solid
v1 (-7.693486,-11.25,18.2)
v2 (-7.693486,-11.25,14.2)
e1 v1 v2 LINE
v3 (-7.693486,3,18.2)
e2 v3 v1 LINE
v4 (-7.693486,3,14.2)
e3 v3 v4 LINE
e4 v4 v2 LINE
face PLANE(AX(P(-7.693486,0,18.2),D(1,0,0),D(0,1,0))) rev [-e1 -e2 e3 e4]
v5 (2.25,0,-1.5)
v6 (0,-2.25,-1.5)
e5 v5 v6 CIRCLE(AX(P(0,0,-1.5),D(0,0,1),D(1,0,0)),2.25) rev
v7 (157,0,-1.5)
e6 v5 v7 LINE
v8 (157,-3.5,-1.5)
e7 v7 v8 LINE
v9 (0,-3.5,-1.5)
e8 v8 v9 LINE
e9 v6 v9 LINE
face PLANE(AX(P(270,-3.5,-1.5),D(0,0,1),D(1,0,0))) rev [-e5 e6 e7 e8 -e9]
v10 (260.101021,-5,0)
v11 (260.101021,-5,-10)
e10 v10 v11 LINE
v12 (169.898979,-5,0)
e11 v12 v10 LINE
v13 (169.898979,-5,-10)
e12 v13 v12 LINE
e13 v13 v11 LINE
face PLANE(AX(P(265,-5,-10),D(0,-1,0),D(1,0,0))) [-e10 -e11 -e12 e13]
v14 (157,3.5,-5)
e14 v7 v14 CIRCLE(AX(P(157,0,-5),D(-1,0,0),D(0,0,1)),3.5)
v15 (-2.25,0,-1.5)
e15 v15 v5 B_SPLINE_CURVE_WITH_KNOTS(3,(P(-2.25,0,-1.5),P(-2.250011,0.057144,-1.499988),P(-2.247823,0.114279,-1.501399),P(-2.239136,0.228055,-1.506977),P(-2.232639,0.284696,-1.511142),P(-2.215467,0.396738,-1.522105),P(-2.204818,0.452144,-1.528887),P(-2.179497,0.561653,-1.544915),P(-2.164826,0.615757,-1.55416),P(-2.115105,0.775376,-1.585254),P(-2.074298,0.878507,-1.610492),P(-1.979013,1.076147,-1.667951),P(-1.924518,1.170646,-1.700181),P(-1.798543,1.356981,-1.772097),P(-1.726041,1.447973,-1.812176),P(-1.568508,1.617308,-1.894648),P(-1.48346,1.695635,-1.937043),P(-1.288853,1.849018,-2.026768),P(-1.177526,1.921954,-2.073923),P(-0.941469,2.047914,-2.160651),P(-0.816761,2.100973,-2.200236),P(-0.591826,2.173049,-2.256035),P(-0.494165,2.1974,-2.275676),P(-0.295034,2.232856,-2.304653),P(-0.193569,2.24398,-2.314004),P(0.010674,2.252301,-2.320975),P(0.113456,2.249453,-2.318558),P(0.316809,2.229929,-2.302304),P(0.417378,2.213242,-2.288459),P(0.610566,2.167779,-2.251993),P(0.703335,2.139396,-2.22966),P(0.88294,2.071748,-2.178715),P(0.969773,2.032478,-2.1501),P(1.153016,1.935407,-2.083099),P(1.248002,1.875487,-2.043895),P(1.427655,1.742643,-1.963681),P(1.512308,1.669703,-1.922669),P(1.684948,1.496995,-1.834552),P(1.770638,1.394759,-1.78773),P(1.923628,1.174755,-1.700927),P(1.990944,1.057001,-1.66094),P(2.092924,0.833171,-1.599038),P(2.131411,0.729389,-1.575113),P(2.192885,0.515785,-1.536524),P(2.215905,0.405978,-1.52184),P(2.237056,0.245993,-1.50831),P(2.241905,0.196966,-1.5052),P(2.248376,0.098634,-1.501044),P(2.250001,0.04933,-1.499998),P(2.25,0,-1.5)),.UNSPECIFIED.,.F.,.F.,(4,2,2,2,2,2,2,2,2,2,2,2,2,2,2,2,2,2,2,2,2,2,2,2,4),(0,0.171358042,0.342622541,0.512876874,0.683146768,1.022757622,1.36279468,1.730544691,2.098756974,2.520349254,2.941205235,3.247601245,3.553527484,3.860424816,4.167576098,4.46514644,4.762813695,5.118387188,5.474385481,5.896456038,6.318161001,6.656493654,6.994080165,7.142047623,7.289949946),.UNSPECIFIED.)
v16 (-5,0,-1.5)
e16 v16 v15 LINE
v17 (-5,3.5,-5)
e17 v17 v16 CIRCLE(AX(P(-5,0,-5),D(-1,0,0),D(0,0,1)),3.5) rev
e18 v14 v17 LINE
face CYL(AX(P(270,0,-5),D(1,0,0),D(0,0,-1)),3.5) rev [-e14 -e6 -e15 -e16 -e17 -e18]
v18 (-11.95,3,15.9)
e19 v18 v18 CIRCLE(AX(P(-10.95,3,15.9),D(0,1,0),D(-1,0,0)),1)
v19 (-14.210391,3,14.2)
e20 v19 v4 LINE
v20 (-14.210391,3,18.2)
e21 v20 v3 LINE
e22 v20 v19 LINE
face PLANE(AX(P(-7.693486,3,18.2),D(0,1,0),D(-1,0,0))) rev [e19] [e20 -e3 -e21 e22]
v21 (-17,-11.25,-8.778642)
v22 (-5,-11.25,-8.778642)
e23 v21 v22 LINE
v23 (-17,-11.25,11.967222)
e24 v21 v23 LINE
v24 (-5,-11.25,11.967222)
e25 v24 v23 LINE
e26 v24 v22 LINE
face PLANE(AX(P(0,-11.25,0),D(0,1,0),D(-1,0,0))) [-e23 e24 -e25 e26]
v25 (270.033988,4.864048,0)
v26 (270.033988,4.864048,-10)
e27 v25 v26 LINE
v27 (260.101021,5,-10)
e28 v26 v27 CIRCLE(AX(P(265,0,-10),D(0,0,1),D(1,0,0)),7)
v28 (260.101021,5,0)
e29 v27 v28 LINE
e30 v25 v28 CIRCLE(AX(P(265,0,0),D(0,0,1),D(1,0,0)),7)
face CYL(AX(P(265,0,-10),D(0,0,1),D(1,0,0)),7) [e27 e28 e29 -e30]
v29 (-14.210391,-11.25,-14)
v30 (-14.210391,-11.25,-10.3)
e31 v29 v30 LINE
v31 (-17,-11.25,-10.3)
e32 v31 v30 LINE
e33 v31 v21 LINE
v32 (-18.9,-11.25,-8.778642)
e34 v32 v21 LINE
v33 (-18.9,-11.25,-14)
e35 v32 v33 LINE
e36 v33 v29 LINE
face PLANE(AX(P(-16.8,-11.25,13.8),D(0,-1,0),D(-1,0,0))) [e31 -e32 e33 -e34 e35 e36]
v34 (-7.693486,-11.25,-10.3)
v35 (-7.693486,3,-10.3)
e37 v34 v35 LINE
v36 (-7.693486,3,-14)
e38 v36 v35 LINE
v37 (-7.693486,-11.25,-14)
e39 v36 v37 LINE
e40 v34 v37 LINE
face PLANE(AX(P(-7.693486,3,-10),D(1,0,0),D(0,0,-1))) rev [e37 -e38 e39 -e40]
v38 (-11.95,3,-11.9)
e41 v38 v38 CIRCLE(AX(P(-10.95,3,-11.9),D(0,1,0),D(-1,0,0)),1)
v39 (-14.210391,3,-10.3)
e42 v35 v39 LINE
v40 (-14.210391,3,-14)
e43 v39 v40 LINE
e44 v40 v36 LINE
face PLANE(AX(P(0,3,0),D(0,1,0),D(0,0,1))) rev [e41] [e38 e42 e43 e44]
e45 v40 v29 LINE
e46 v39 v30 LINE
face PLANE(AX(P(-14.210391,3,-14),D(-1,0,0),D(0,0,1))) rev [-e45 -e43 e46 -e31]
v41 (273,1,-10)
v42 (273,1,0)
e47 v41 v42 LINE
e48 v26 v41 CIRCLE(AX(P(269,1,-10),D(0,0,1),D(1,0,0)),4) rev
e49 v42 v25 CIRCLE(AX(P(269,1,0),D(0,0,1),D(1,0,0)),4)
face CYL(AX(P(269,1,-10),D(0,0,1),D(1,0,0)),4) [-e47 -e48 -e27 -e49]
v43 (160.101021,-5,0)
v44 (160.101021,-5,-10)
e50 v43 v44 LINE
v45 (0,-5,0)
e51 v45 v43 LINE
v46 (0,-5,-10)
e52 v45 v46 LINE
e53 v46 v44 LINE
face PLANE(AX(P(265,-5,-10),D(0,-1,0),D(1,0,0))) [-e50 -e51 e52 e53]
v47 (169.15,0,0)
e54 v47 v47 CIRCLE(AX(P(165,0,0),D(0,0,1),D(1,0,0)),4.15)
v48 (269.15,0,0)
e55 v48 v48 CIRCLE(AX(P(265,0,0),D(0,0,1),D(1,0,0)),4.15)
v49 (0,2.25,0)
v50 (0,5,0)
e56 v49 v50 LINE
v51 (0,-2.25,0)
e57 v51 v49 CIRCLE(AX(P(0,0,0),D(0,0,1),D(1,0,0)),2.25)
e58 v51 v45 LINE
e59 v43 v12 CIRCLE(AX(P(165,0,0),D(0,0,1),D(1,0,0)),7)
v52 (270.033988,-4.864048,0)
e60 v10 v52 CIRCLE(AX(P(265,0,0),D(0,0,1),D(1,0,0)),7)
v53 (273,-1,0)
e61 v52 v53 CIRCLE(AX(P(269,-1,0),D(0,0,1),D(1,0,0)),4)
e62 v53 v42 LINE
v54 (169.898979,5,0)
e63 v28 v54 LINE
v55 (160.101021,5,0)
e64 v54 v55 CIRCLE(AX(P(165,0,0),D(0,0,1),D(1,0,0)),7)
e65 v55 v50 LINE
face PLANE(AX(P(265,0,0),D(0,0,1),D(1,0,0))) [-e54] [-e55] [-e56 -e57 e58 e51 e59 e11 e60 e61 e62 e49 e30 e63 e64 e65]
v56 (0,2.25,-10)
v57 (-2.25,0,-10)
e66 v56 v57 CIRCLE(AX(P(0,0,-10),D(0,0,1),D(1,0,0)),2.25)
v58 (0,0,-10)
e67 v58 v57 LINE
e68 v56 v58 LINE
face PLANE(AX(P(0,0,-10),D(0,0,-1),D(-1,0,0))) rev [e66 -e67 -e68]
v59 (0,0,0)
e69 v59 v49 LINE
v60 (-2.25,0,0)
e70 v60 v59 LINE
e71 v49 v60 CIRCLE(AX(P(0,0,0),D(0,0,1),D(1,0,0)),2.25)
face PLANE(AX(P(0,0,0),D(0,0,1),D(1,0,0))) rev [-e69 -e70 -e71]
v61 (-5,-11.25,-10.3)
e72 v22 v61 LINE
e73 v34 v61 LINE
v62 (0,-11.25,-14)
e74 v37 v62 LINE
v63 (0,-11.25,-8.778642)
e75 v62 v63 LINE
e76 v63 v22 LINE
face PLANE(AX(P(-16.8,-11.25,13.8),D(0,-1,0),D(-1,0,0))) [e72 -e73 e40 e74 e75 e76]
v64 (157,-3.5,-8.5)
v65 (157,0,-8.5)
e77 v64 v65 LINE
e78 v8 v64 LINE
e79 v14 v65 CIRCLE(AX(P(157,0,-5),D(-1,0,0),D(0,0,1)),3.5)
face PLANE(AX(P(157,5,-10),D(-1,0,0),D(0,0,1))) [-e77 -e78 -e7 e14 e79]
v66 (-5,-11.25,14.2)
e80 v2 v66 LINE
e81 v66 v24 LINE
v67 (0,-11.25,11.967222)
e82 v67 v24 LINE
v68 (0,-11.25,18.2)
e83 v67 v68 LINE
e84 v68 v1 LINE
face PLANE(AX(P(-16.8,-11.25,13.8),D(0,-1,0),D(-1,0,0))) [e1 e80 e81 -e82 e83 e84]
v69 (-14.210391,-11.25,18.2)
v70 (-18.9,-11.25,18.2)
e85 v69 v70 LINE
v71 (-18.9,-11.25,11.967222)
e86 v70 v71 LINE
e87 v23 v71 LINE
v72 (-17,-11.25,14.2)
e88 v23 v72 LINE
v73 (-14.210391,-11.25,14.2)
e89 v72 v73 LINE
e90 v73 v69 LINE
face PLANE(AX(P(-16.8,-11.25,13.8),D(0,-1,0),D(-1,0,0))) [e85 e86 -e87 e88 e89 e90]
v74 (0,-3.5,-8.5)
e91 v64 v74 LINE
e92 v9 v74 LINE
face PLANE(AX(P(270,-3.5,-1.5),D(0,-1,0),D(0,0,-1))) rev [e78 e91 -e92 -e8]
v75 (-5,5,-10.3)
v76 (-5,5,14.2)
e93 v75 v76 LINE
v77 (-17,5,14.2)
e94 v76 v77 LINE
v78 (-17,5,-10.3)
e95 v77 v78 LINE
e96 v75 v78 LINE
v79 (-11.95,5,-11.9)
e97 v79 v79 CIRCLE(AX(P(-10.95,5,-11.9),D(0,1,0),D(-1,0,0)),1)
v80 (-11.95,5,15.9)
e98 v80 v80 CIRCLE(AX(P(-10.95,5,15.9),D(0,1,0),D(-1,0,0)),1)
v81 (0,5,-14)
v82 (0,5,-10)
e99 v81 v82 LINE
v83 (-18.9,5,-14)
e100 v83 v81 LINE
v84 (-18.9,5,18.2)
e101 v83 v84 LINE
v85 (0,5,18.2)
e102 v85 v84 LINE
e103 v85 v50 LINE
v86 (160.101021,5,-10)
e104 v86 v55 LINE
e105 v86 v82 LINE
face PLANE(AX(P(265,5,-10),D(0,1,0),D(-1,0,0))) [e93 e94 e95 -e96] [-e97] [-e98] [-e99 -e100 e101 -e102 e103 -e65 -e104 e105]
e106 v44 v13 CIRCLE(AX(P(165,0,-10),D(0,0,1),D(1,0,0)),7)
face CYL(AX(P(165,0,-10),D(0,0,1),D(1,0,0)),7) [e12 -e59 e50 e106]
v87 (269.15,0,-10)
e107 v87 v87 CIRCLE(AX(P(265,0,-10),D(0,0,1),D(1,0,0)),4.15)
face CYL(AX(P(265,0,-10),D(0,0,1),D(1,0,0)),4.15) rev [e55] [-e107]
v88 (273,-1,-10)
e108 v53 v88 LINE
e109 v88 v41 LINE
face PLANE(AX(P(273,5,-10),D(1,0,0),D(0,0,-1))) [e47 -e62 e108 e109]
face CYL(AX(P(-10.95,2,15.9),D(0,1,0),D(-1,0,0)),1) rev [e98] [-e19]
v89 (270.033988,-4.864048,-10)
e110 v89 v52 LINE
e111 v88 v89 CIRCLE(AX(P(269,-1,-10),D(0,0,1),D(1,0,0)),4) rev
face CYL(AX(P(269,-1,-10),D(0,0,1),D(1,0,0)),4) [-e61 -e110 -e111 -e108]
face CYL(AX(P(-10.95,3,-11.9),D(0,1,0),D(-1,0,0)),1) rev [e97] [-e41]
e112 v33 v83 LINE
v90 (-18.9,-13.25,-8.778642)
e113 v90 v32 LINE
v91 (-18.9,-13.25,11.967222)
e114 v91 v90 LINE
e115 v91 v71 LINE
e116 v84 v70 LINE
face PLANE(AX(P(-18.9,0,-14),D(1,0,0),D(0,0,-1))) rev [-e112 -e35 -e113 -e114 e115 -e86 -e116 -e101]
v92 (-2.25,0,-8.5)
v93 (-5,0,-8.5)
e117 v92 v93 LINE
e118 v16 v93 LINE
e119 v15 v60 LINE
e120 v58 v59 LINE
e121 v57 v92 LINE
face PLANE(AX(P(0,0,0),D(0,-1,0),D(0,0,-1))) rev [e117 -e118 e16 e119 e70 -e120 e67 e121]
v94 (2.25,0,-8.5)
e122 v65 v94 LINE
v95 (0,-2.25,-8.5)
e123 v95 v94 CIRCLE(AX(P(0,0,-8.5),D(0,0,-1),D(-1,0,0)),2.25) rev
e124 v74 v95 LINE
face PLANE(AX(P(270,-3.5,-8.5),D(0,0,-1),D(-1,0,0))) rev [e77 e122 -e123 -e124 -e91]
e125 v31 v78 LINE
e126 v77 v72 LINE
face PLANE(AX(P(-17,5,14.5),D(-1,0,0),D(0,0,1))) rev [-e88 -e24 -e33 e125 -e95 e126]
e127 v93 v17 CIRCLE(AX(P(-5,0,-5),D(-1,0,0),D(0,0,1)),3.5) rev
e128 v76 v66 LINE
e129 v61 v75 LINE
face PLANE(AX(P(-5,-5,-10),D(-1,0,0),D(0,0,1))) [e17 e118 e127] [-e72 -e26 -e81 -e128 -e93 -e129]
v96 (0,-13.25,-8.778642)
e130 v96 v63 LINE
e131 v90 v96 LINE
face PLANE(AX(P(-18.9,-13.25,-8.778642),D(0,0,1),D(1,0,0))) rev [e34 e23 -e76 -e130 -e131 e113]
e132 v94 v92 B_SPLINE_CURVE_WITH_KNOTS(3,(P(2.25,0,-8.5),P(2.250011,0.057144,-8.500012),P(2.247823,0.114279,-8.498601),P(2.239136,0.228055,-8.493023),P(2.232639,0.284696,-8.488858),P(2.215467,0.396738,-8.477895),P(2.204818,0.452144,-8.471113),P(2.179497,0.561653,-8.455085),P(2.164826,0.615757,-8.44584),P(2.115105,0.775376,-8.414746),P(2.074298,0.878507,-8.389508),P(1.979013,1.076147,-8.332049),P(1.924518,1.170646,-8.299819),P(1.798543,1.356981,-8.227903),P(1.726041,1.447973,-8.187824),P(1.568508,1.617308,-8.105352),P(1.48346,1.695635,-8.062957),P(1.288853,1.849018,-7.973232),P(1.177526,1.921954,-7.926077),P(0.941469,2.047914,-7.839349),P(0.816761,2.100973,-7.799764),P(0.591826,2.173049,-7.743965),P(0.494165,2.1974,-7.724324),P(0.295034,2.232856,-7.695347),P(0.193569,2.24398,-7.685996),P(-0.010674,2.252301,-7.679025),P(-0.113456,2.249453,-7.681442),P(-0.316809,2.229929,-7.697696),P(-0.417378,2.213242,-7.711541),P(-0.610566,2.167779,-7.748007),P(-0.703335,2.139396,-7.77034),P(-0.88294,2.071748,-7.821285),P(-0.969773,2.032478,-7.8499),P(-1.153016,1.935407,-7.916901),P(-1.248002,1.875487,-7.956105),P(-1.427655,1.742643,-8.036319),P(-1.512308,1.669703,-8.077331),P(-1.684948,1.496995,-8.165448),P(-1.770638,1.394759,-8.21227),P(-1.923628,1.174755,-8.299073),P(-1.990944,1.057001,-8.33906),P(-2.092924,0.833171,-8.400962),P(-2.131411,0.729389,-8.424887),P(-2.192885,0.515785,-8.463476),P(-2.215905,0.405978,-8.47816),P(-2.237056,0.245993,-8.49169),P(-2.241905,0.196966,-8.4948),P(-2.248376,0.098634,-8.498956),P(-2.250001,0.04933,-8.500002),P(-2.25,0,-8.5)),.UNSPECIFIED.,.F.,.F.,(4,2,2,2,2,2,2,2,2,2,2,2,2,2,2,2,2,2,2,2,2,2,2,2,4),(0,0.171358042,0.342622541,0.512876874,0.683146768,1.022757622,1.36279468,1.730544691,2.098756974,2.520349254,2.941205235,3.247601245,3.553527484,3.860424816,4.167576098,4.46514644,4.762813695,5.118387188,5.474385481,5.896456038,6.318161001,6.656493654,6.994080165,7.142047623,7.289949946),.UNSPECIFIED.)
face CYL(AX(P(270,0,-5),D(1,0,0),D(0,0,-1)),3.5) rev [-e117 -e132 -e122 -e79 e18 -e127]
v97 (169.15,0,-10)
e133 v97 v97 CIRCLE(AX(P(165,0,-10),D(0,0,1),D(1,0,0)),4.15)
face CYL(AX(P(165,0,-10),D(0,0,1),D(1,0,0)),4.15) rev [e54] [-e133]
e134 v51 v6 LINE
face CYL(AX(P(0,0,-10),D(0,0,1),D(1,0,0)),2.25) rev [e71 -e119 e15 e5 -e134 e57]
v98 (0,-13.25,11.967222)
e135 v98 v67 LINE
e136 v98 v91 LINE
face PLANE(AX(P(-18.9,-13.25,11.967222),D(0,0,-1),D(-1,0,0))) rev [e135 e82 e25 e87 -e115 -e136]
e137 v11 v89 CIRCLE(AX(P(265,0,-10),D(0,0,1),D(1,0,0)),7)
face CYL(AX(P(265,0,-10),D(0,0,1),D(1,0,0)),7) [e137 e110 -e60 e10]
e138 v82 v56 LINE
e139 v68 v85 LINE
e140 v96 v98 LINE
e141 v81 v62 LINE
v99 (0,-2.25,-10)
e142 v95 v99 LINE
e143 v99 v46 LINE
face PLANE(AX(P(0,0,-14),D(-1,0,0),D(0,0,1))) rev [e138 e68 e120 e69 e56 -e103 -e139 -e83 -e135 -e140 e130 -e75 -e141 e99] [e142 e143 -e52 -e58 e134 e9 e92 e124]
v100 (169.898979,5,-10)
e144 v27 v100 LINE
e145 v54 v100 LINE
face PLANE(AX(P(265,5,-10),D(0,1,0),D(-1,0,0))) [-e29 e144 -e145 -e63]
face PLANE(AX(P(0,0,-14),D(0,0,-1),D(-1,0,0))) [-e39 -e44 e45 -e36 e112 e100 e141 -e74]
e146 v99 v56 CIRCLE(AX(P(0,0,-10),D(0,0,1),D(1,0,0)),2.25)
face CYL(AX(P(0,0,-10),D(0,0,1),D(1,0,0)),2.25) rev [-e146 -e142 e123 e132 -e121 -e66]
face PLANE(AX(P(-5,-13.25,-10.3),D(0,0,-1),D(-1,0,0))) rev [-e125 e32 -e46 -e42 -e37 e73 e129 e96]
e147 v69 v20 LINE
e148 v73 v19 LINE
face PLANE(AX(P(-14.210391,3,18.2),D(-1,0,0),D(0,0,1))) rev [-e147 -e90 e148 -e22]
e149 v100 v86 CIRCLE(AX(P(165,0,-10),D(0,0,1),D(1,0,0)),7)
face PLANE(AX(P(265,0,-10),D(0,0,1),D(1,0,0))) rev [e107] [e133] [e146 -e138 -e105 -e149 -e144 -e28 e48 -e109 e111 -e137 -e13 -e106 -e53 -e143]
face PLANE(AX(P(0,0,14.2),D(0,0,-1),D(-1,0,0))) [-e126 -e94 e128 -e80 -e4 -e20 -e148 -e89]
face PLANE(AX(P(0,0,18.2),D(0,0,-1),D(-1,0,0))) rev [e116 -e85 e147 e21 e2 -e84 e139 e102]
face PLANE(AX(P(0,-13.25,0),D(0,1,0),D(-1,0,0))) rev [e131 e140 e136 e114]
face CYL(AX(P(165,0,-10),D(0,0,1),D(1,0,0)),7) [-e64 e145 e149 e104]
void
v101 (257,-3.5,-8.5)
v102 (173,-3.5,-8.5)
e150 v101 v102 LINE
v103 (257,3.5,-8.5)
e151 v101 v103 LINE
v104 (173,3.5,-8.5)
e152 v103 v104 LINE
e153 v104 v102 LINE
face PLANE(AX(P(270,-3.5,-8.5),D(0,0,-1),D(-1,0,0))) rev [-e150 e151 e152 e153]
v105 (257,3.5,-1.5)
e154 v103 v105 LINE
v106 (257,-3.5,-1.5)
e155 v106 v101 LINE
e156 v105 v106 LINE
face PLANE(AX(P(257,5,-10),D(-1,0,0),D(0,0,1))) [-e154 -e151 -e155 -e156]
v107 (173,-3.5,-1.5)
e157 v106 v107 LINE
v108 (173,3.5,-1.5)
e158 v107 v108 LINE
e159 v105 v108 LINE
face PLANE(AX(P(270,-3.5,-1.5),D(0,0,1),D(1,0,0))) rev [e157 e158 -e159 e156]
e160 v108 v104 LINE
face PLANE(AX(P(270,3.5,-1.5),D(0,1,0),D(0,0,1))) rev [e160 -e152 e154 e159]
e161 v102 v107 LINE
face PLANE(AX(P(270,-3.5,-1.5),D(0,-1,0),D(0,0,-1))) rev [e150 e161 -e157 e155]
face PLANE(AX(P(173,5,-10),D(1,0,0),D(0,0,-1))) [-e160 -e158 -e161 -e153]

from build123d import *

# Parameters (mm, degrees)
SKETCH_1_R          = 2.25
SKETCH_1_R_2        = 1.75
EXTRUDE_1_DEPTH     = 10
SKETCH_3_W          = 7
SKETCH_3_H          = 7
CUT_EXTRUDE_1_DEPTH = 276.22717889
EXTRUDE_2_DEPTH     = 4
SKETCH_7_R          = 1
CUT_EXTRUDE_2_DEPTH = 2
SKETCH_8_W          = 6.516904704
SKETCH_8_H          = 4
CUT_EXTRUDE_3_DEPTH = 3
SKETCH_9_W          = 1.9
SKETCH_9_H          = 5
EXTRUDE_3_DEPTH     = 24.5
SKETCH_10_W         = 5
SKETCH_10_H         = 5
EXTRUDE_4_DEPTH     = 14.2
EXTRUDE_9_DEPTH     = 4
SKETCH_12_R         = 1
CUT_EXTRUDE_4_DEPTH = 3
EXTRUDE_10_DEPTH    = 11.25
SKETCH_14_W         = 18.9
SKETCH_14_H         = 20.745864208
EXTRUDE_13_DEPTH    = 2
SKETCH_15_W         = 12
SKETCH_15_H         = 0.3
CUT_EXTRUDE_5_DEPTH = 272.22739998
SKETCH_16_W         = 16
SKETCH_16_H         = 10
EXTRUDE_14_DEPTH    = 10
FILLET_1_R          = 4
SKETCH_17_R         = 4.04
CUT_EXTRUDE_7_DEPTH = 10
SKETCH_20_R         = 7
SKETCH_20_R_2       = 4.04
EXTRUDE_15_DEPTH    = 10
FILLET_3_R          = 3.5
SKETCH_21_R         = 4.15
CUT_EXTRUDE_8_DEPTH = 10


with BuildPart() as part:
    # 草图1 → 凸台-拉伸1 (new body)
    with BuildSketch(Plane.XY):
        with BuildLine():
            Line((265, 5), (-5, 5))
            Line((-5, 5), (-5, -5))
            Line((-5, -5), (265, -5))
            ThreePointArc((265, -5), (270, 0), (265, 5))
        make_face()
        Circle(SKETCH_1_R, mode=Mode.SUBTRACT)
        with Locations((165, 0)):
            Circle(SKETCH_1_R_2, mode=Mode.SUBTRACT)
        with Locations((265, 0)):
            Circle(SKETCH_1_R_2, mode=Mode.SUBTRACT)
    extrude(amount=-EXTRUDE_1_DEPTH)

    # 草图3 → 切除-拉伸1 (cut, through all)
    with BuildSketch(Plane.ZY.offset(5)):
        with Locations((-5, 0)):
            Rectangle(SKETCH_3_W, SKETCH_3_H)
    extrude(amount=-CUT_EXTRUDE_1_DEPTH, mode=Mode.SUBTRACT)

    # 草图5 → 凸台-拉伸2 (add)
    with BuildSketch(Plane(origin=(0, 0, -10), x_dir=(-1, 0, 0), z_dir=(0, 0, -1))):
        Polygon((5, 5), (18.9, 5), (18.9, 0), (0, 0), (0, 5), align=None)
    extrude(amount=EXTRUDE_2_DEPTH)

    # 草图7 → 切除-拉伸2 (cut)
    with BuildSketch(Plane(origin=(0, 5, 0), x_dir=(1, 0, 0), z_dir=(0, 1, 0))):
        with Locations(Location((-10.95, 11.9, 0), (0, 0, 180))):
            Circle(SKETCH_7_R)
    extrude(amount=-CUT_EXTRUDE_2_DEPTH, mode=Mode.SUBTRACT)

    # 草图8 → 切除-拉伸3 (cut)
    with BuildSketch(Plane.XZ):
        with Locations((-10.951938586, -12)):
            Rectangle(SKETCH_8_W, SKETCH_8_H)
    extrude(amount=-CUT_EXTRUDE_3_DEPTH, mode=Mode.SUBTRACT)

    # 草图9 → 凸台-拉伸3 (add)
    with BuildSketch(Plane.XY.offset(-10)):
        with Locations((-17.95, 2.5)):
            Rectangle(SKETCH_9_W, SKETCH_9_H)
    extrude(amount=EXTRUDE_3_DEPTH)

    # 草图10 → 凸台-拉伸4 (add)
    with BuildSketch(Plane.XY):
        with Locations((-2.5, 2.5)):
            Rectangle(SKETCH_10_W, SKETCH_10_H)
    extrude(amount=EXTRUDE_4_DEPTH)

    # 草图11 → 凸台-拉伸9 (add)
    with BuildSketch(Plane.XY.offset(14.2)):
        Polygon((0, 0), (-7.693486234, 0), (-7.693486234, 3), (-14.210390938, 3), (-14.210390938, 0), (-18.9, 0), (-18.9, 5), (0, 5), align=None)
    extrude(amount=EXTRUDE_9_DEPTH)

    # 草图12 → 切除-拉伸4 (cut)
    with BuildSketch(Plane(origin=(0, 5, 0), x_dir=(1, 0, 0), z_dir=(0, 1, 0))):
        with Locations(Location((-10.95, -15.9, 0), (0, 0, 180))):
            Circle(SKETCH_12_R)
    extrude(amount=-CUT_EXTRUDE_4_DEPTH, mode=Mode.SUBTRACT)

    # 草图13 → 凸台-拉伸10 (add)
    with BuildSketch(Plane.XZ):
        Polygon((-14.210390938, -14), (-14.210390938, -10), (-17, -10), (-17, 14.2), (-14.210390938, 14.2), (-14.210390938, 18.2), (-18.9, 18.2), (-18.9, -14), align=None)
        Polygon((-7.693486234, -14), (0, -14), (0, -10), (0, 18.2), (-7.693486234, 18.2), (-7.693486234, 14.2), (-5, 14.2), (-5, -10), (-7.693486234, -10), align=None)
    extrude(amount=EXTRUDE_10_DEPTH)

    # 草图14 → 凸台-拉伸13 (add)
    with BuildSketch(Plane(origin=(0, -11.25, 0), x_dir=(-1, 0, 0), z_dir=(0, -1, 0))):
        with Locations((9.45, -1.594289746)):
            Rectangle(SKETCH_14_W, SKETCH_14_H)
    extrude(amount=EXTRUDE_13_DEPTH)

    # 草图15 → 切除-拉伸5 (cut, through all)
    with BuildSketch(Plane(origin=(0, 5, 0), x_dir=(1, 0, 0), z_dir=(0, 1, 0))):
        with Locations((-11, 10.15)):
            Rectangle(SKETCH_15_W, SKETCH_15_H)
    extrude(amount=-CUT_EXTRUDE_5_DEPTH, mode=Mode.SUBTRACT)

    # 草图16 → 凸台-拉伸14 (add)
    with BuildSketch(Plane.XY):
        with Locations((165, 0)):
            Rectangle(SKETCH_16_W, SKETCH_16_H)
        with Locations((265, 0)):
            Rectangle(SKETCH_16_W, SKETCH_16_H)
    extrude(amount=-EXTRUDE_14_DEPTH)

    # 圆角1
    fillet_1_edges = [part.edges().sort_by_distance(p)[0] for p in [
        (273, -5, -5),
        (273, 5, -5),
    ]]
    fillet(fillet_1_edges, radius=FILLET_1_R)

    # 草图17 → 切除-拉伸7 (cut)
    with BuildSketch(Plane.XY):
        with Locations((165, 0)):
            Circle(SKETCH_17_R)
        with Locations((265, 0)):
            Circle(SKETCH_17_R)
    extrude(amount=-CUT_EXTRUDE_7_DEPTH, mode=Mode.SUBTRACT)

    # 草图20 → 凸台-拉伸15 (add)
    # profile 1 of 2: a face of its own
    with BuildSketch(Plane.XY):
        with Locations((165, 0)):
            Circle(SKETCH_20_R)
        with Locations((165, 0)):
            Circle(SKETCH_20_R_2, mode=Mode.SUBTRACT)
    # profile 2 of 2: a face of its own
    with BuildSketch(Plane.XY):
        with Locations((265, 0)):
            Circle(SKETCH_20_R)
        with Locations((265, 0)):
            Circle(SKETCH_20_R_2, mode=Mode.SUBTRACT)
    extrude(amount=-EXTRUDE_15_DEPTH)

    # 圆角3
    # the kernel refuses this fillet: 3.5 mm, written as the material it adds along each edge
    with BuildSketch(Plane(origin=(-5, 3.5, -8.5), x_dir=(0, -1, 0), z_dir=(1, 0, 0))) as fillet_3_piece_1_section:
        with BuildLine():
            CenterArc((FILLET_3_R, -FILLET_3_R), FILLET_3_R, 90, 90)
            Line((0, -FILLET_3_R), (0, 0))
            Line((0, 0), (FILLET_3_R, 0))
        make_face()
    fillet_3_piece_1 = extrude(amount=162, mode=Mode.PRIVATE)
    fillet_3_piece_1 = fillet_3_piece_1 - Plane(origin=(0, 0, -7.682274374), x_dir=(1, 0, 0), z_dir=(0, 0, 1)) * Cylinder(2.25, 339, mode=Mode.PRIVATE)
    add(fillet_3_piece_1)
    with BuildSketch(Plane(origin=(-5, 3.5, -1.5), x_dir=(0, -1, 0), z_dir=(1, 0, 0))) as fillet_3_piece_2_section:
        with BuildLine():
            CenterArc((FILLET_3_R, FILLET_3_R), FILLET_3_R, 180, 90)
            Line((0, FILLET_3_R), (0, 0))
            Line((0, 0), (FILLET_3_R, 0))
        make_face()
    fillet_3_piece_2 = extrude(amount=162, mode=Mode.PRIVATE)
    fillet_3_piece_2 = fillet_3_piece_2 - Plane(origin=(0, 0, -2.317725626), x_dir=(1, 0, 0), z_dir=(0, 0, 1)) * Cylinder(2.25, 339, mode=Mode.PRIVATE)
    add(fillet_3_piece_2)

    # 草图21 → 切除-拉伸8 (cut)
    with BuildSketch(Plane.XY):
        with Locations((165, 0)):
            Circle(SKETCH_21_R)
        with Locations((265, 0)):
            Circle(SKETCH_21_R)
    extrude(amount=-CUT_EXTRUDE_8_DEPTH, mode=Mode.SUBTRACT)


solid = part.part
